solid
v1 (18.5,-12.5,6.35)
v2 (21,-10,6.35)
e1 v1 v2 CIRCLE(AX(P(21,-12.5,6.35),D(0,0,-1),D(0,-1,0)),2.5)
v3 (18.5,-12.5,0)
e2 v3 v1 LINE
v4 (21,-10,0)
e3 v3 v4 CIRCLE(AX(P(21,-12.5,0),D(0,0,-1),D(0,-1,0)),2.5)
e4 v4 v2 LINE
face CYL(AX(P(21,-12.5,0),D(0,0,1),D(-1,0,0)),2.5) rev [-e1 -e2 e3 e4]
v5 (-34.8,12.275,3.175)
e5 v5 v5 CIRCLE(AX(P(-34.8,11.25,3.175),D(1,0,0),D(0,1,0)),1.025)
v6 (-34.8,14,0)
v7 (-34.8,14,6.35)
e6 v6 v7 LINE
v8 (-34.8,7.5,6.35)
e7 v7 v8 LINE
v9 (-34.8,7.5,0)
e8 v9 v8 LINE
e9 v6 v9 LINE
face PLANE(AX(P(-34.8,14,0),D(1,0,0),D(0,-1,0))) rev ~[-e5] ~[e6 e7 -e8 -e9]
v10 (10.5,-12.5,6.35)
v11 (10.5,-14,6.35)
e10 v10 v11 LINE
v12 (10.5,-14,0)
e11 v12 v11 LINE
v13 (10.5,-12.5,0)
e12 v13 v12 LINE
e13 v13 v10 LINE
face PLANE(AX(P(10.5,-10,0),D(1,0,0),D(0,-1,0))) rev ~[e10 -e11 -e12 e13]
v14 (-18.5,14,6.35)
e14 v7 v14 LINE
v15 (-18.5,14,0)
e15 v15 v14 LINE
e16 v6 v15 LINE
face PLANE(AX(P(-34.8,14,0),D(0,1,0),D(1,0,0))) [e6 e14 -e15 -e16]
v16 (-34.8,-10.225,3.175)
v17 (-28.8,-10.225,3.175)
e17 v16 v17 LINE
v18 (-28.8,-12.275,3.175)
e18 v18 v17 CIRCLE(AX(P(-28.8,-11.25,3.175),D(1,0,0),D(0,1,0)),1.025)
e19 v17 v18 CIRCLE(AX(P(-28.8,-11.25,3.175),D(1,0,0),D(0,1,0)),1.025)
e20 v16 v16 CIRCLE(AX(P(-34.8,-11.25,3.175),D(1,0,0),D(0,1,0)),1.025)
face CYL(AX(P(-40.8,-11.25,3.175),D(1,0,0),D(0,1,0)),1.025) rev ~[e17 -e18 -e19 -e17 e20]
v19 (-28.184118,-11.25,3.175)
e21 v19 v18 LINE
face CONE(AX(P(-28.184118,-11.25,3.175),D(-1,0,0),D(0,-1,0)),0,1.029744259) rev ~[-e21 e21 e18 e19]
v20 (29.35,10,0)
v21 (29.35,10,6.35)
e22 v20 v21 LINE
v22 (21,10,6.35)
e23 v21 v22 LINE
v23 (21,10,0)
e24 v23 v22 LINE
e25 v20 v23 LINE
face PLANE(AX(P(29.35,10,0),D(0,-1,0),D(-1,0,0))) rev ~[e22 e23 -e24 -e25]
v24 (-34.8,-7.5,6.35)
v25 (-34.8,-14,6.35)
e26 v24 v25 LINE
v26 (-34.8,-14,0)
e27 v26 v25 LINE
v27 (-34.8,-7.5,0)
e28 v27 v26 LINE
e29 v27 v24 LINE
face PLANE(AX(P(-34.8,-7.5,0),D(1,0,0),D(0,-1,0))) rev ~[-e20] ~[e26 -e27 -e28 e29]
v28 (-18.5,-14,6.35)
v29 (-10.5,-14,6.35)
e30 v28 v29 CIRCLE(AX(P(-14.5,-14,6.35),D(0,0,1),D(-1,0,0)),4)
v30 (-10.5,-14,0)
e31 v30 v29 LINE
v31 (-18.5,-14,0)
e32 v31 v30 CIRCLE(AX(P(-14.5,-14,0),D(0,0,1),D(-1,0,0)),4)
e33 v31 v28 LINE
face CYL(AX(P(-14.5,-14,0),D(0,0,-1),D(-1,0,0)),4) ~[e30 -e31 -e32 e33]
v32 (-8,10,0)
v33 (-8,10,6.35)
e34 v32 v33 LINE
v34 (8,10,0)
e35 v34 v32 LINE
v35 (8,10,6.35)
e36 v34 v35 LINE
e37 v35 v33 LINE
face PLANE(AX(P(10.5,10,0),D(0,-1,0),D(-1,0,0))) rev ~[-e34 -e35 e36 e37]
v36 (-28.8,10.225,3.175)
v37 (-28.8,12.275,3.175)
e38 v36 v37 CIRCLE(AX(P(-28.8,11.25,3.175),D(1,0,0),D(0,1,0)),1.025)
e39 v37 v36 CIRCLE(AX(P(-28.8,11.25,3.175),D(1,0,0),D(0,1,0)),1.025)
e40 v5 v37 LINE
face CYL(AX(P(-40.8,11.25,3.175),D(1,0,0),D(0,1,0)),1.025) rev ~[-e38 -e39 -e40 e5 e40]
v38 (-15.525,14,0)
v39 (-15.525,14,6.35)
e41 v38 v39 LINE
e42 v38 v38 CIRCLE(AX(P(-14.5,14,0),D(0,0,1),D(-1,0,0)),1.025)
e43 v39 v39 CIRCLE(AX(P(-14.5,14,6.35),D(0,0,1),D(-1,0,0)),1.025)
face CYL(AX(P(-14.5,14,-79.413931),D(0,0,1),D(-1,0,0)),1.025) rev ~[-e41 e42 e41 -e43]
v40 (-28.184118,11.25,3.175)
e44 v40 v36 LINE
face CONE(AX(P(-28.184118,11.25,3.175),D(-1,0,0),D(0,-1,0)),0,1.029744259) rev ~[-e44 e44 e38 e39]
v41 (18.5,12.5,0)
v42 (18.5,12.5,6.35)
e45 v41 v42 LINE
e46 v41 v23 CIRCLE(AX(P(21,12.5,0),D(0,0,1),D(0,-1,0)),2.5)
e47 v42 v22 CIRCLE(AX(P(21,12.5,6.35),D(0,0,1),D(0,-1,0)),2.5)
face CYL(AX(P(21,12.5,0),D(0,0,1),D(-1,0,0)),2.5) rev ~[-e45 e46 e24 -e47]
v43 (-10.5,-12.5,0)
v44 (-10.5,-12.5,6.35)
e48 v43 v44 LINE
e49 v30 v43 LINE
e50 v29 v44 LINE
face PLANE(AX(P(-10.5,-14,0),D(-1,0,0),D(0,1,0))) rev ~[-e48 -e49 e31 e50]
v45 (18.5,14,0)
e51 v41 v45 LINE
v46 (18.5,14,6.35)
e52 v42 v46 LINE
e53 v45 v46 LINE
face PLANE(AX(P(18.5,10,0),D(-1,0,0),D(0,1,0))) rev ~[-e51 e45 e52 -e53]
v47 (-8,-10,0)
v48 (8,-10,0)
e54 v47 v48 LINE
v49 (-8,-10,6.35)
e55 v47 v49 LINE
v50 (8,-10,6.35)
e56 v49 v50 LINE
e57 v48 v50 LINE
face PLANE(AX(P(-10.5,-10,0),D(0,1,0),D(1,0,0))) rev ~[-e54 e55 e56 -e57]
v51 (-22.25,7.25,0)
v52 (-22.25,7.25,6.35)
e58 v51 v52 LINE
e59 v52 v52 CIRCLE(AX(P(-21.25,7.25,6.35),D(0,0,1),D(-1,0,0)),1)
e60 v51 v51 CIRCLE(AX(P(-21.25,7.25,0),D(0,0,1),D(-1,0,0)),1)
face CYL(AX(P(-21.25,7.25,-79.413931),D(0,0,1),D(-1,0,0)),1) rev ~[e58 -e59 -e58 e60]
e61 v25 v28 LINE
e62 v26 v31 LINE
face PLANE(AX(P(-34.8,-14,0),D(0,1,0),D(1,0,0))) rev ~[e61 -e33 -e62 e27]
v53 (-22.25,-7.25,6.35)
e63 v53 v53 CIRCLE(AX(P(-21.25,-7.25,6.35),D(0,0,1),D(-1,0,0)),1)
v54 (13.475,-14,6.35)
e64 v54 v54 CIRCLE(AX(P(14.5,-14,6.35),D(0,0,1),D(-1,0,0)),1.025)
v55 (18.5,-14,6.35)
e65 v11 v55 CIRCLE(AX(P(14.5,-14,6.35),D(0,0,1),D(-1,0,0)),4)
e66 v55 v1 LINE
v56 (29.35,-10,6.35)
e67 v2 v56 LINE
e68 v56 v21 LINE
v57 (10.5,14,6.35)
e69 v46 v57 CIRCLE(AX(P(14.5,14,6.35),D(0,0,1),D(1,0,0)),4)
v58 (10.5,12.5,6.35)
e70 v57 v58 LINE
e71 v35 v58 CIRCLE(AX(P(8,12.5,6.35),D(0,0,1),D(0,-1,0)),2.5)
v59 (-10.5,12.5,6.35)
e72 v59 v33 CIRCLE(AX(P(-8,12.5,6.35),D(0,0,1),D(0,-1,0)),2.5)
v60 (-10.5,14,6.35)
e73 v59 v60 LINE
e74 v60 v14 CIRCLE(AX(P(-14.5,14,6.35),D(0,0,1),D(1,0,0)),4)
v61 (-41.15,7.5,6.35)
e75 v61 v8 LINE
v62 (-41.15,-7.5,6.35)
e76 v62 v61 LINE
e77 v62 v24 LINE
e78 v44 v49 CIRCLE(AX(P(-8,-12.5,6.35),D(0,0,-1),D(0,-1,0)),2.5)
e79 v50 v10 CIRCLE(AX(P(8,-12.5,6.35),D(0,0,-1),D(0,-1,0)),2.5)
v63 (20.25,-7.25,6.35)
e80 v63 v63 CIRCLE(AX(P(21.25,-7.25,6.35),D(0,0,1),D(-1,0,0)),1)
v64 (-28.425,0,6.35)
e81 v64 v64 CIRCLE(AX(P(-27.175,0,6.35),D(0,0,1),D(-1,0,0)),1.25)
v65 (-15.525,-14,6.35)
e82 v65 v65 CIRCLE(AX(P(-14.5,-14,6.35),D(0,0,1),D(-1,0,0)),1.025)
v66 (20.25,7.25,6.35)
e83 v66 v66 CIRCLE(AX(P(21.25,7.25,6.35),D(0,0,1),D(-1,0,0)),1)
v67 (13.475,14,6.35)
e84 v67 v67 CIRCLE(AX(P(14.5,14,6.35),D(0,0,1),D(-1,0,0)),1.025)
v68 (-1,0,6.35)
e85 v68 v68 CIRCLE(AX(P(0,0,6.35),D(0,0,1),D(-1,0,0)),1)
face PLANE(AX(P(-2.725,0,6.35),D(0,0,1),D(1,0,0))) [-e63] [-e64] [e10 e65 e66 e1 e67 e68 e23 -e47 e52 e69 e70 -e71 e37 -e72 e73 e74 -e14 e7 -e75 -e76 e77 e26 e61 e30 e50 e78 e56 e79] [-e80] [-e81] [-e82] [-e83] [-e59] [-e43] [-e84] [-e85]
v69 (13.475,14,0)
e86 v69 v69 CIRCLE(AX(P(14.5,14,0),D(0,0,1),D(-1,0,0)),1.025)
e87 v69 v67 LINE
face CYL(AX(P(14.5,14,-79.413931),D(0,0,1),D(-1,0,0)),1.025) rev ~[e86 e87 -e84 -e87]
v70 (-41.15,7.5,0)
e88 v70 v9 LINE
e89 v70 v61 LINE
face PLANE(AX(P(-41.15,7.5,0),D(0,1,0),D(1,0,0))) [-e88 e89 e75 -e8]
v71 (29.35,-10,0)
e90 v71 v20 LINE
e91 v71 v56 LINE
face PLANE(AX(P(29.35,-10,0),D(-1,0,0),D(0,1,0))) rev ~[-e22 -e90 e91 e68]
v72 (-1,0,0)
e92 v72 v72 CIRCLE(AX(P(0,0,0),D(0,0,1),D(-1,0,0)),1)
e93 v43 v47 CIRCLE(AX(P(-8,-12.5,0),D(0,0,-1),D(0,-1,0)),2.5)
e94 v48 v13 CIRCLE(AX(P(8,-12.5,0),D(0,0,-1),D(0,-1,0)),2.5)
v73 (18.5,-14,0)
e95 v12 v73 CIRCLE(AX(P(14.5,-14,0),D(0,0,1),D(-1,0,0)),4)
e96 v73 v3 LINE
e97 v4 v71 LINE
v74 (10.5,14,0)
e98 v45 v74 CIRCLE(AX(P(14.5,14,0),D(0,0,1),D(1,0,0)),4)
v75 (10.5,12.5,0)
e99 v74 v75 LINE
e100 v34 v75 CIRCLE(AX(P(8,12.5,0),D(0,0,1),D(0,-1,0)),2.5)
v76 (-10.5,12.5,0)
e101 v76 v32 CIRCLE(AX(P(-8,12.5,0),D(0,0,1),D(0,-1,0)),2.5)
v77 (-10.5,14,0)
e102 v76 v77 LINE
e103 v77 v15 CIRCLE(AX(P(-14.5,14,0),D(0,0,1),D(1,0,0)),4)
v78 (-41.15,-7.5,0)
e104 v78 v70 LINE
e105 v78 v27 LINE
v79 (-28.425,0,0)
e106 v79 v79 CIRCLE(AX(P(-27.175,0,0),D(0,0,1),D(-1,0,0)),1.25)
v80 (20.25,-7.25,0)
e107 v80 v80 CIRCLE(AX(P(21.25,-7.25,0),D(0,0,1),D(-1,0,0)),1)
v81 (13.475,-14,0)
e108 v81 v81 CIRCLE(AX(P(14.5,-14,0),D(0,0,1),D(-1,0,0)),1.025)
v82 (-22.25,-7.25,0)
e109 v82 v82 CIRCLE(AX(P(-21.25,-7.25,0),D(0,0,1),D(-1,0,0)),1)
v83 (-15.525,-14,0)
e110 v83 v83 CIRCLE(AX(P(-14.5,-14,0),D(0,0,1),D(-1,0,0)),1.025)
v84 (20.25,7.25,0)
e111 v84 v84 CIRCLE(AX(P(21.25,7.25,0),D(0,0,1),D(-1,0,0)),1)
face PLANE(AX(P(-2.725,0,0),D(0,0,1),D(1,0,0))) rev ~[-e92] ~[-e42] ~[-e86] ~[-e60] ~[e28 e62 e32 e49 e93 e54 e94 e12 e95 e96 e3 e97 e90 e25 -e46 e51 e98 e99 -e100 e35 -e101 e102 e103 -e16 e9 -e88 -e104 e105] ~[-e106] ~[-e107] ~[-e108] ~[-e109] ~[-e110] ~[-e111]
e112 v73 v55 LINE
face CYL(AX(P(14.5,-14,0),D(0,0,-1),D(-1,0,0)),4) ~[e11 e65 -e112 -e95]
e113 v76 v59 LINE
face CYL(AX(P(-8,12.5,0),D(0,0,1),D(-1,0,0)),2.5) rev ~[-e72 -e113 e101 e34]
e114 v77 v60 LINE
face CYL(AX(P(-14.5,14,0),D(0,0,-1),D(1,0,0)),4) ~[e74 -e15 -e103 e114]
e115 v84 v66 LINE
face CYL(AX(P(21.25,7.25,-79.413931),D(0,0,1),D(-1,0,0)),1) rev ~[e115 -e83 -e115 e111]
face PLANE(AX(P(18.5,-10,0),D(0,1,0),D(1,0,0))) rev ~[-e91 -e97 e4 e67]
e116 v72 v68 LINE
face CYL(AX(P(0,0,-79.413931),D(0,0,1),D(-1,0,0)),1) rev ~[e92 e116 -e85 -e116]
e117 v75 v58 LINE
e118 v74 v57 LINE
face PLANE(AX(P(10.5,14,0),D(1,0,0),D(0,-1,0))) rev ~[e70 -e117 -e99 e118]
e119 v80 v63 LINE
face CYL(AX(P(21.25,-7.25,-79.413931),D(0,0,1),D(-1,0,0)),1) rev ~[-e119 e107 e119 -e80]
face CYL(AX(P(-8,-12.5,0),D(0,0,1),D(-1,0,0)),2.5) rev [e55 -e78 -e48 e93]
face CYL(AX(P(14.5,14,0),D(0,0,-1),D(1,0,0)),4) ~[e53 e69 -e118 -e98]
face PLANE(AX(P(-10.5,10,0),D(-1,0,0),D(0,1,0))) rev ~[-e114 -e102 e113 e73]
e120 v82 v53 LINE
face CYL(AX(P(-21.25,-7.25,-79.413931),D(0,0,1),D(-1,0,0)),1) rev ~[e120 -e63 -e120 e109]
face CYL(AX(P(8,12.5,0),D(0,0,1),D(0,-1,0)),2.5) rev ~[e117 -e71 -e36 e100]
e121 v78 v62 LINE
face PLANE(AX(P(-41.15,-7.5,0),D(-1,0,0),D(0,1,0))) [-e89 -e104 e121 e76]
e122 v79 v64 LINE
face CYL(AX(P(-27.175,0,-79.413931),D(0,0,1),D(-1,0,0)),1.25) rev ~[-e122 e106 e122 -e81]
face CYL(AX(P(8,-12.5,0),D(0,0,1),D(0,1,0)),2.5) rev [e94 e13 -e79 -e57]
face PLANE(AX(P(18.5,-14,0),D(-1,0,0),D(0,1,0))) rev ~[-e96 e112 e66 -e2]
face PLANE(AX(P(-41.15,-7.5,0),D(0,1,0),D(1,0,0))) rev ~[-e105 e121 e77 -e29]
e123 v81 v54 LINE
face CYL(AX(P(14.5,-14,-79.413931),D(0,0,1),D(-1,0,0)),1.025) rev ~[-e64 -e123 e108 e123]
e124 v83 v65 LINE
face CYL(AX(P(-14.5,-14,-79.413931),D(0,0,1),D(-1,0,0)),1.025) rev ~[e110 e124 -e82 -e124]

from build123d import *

# Parameters (mm, degrees)
F0_W           = 6.35
F0_H           = 15
F0_W_2         = 16.3
F0_H_2         = 4
F1_DEPTH       = 6.35
F2_D           = 2.05
F3_D           = 2.5
F4_R           = 2.5
F7_D           = 2.05
F7_DEPTH       = 6
F7_TIP         = 0.6158821345
F7_ON_F5_D     = 2.05
F7_ON_F5_DEPTH = 6
F7_ON_F5_TIP   = 0.6158821345
F8_D           = 2


# Not quite as in the source:
# - a length typed as a fraction of an inch, garbled in the dataset ("3 / 203.2 mm" for 3/8 in), is restored
# - a feature names something its author has since deleted; it is built from what else it names


with BuildPart() as f1:
    # F0 (on Top) → F1 (new body)
    with BuildSketch(Plane.XY):
        Polygon((-18.5, 10), (-34.8, 10), (-34.8, 7.5), (-34.8, -7.5), (-34.8, -10), (-18.5, -10), (-14.5, -10), (-11.8, -10), (-10.5, -10), (10.5, -10), (14.5, -10), (18.5, -10), (29.35, -10), (29.35, 10), (18.5, 10), (14.5000000137, 10), (10.5, 10), (-10.5, 10), (-14.5, 10), align=None)
        with Locations((-37.975, 0)):
            Rectangle(F0_W, F0_H)
        with BuildLine():
            Line((-18.5, 14), (-18.5, 10))
            Line((-18.5, 10), (-14.5, 10))
            ThreePointArc((-14.5, 10), (-17.3284271247, 11.1715728753), (-18.5, 14))
        make_face()
        with BuildLine():
            ThreePointArc((-10.5, 14), (-11.6715728753, 11.1715728753), (-14.5, 10))
            Line((-14.5, 10), (-10.5, 10))
            Line((-10.5, 10), (-10.5, 14))
        make_face()
        with BuildLine():
            ThreePointArc((-18.5, 14), (-17.3284271247, 11.1715728753), (-14.5, 10))
            ThreePointArc((-14.5, 10), (-11.6715728753, 11.1715728753), (-10.5, 14))
            Line((-10.5, 14), (-18.5, 14))
        make_face()
        with BuildLine():
            ThreePointArc((-10.5, 14), (-14.5, 18), (-18.5, 14))
            Line((-18.5, 14), (-10.5, 14))
        make_face()
        with BuildLine():
            Line((10.5, 14), (10.5, 10))
            Line((10.5, 10), (14.5000000137, 10))
            ThreePointArc((14.5000000137, 10), (11.6715728801, 11.1715728704), (10.5, 14))
        make_face()
        with BuildLine():
            ThreePointArc((10.5, 14), (11.6715728801, 11.1715728704), (14.5000000137, 10))
            ThreePointArc((14.5000000137, 10), (17.3284271296, 11.1715728801), (18.5, 14))
            ThreePointArc((18.5, 14), (14.5, 18), (10.5, 14))
        make_face()
        with BuildLine():
            ThreePointArc((18.5, 14), (17.3284271296, 11.1715728801), (14.5000000137, 10))
            Line((14.5000000137, 10), (18.5, 10))
            Line((18.5, 10), (18.5, 14))
        make_face()
        with BuildLine():
            ThreePointArc((18.5, -14), (17.3284271247, -11.1715728753), (14.5, -10))
            ThreePointArc((14.5, -10), (11.6715728753, -11.1715728753), (10.5, -14))
            ThreePointArc((10.5, -14), (14.5, -18), (18.5, -14))
        make_face()
        with BuildLine():
            Line((18.5, -14), (18.5, -10))
            Line((18.5, -10), (14.5, -10))
            ThreePointArc((14.5, -10), (17.3284271247, -11.1715728753), (18.5, -14))
        make_face()
        with BuildLine():
            Line((14.5, -10), (10.5, -10))
            Line((10.5, -10), (10.5, -14))
            ThreePointArc((10.5, -14), (11.6715728753, -11.1715728753), (14.5, -10))
        make_face()
        with BuildLine():
            ThreePointArc((-10.5, -14), (-11.6715728753, -11.1715728753), (-14.5, -10))
            ThreePointArc((-14.5, -10), (-17.3284271247, -11.1715728753), (-18.5, -14))
            ThreePointArc((-18.5, -14), (-14.5, -18), (-10.5, -14))
        make_face()
        with BuildLine():
            Line((-11.8, -10), (-14.5, -10))
            ThreePointArc((-14.5, -10), (-11.6715728753, -11.1715728753), (-10.5, -14))
            Line((-10.5, -14), (-10.5, -10))
            Line((-10.5, -10), (-11.8, -10))
        make_face()
        with BuildLine():
            Line((-14.5, -10), (-18.5, -10))
            Line((-18.5, -10), (-18.5, -14))
            ThreePointArc((-18.5, -14), (-17.3284271247, -11.1715728753), (-14.5, -10))
        make_face()
        with Locations((-26.65, 12)):
            Rectangle(F0_W_2, F0_H_2)
        with Locations((-26.65, -12)):
            Rectangle(F0_W_2, F0_H_2)
    extrude(amount=F1_DEPTH)

    # F2 (through all)
    with Locations(Plane(origin=(0, 0, 0), x_dir=(1, 0, 0), z_dir=(0, 0, -1))):
        with Locations((-14.5, -14), (14.5, -14), (14.5, 14), (-14.5, 14)):
            Hole(F2_D / 2)

    # F3 (through all)
    with Locations(Plane(origin=(0, 0, 0), x_dir=(1, 0, 0), z_dir=(0, 0, -1))):
        with Locations((-27.175, 0)):
            Hole(F3_D / 2)

    # F4
    f4_edges = [f1.edges().sort_by_distance(p)[0] for p in [
        (-10.5, 10, 3.175),
        (10.5, 10, 3.175),
        (18.5, 10, 3.175),
        (-10.5, -10, 3.175),
        (10.5, -10, 3.175),
        (18.5, -10, 3.175),
        (-10.5, 14, 3.175),
    ]]
    fillet(f4_edges, radius=F4_R)

    # F7
    with Locations(Plane(origin=(-34.8, 0, 0), x_dir=(0, -1, 0), z_dir=(-1, 0, 0))):
        with Locations((-11.25, 3.175)):
            Hole(F7_D / 2, depth=F7_DEPTH)
            with Locations((0, 0, -(F7_DEPTH + F7_TIP / 2))):  # 118° drill point
                Cone(0, F7_D / 2, F7_TIP, mode=Mode.SUBTRACT)

    # F7 on F5
    with Locations(Plane(origin=(-34.8, 0, 0), x_dir=(0, -1, 0), z_dir=(-1, 0, 0))):
        with Locations((11.25, 3.175)):
            Hole(F7_ON_F5_D / 2, depth=F7_ON_F5_DEPTH)
            with Locations((0, 0, -(F7_ON_F5_DEPTH + F7_ON_F5_TIP / 2))):  # 118° drill point
                Cone(0, F7_ON_F5_D / 2, F7_ON_F5_TIP, mode=Mode.SUBTRACT)

    # F8 (through all)
    with Locations(Plane(origin=(0, 0, 0), x_dir=(1, 0, 0), z_dir=(0, 0, -1))):
        with Locations((-21.25, -7.25), (-21.25, 7.25), (0, 0), (21.25, -7.25), (21.25, 7.25)):
            Hole(F8_D / 2)


solid = f1.part
